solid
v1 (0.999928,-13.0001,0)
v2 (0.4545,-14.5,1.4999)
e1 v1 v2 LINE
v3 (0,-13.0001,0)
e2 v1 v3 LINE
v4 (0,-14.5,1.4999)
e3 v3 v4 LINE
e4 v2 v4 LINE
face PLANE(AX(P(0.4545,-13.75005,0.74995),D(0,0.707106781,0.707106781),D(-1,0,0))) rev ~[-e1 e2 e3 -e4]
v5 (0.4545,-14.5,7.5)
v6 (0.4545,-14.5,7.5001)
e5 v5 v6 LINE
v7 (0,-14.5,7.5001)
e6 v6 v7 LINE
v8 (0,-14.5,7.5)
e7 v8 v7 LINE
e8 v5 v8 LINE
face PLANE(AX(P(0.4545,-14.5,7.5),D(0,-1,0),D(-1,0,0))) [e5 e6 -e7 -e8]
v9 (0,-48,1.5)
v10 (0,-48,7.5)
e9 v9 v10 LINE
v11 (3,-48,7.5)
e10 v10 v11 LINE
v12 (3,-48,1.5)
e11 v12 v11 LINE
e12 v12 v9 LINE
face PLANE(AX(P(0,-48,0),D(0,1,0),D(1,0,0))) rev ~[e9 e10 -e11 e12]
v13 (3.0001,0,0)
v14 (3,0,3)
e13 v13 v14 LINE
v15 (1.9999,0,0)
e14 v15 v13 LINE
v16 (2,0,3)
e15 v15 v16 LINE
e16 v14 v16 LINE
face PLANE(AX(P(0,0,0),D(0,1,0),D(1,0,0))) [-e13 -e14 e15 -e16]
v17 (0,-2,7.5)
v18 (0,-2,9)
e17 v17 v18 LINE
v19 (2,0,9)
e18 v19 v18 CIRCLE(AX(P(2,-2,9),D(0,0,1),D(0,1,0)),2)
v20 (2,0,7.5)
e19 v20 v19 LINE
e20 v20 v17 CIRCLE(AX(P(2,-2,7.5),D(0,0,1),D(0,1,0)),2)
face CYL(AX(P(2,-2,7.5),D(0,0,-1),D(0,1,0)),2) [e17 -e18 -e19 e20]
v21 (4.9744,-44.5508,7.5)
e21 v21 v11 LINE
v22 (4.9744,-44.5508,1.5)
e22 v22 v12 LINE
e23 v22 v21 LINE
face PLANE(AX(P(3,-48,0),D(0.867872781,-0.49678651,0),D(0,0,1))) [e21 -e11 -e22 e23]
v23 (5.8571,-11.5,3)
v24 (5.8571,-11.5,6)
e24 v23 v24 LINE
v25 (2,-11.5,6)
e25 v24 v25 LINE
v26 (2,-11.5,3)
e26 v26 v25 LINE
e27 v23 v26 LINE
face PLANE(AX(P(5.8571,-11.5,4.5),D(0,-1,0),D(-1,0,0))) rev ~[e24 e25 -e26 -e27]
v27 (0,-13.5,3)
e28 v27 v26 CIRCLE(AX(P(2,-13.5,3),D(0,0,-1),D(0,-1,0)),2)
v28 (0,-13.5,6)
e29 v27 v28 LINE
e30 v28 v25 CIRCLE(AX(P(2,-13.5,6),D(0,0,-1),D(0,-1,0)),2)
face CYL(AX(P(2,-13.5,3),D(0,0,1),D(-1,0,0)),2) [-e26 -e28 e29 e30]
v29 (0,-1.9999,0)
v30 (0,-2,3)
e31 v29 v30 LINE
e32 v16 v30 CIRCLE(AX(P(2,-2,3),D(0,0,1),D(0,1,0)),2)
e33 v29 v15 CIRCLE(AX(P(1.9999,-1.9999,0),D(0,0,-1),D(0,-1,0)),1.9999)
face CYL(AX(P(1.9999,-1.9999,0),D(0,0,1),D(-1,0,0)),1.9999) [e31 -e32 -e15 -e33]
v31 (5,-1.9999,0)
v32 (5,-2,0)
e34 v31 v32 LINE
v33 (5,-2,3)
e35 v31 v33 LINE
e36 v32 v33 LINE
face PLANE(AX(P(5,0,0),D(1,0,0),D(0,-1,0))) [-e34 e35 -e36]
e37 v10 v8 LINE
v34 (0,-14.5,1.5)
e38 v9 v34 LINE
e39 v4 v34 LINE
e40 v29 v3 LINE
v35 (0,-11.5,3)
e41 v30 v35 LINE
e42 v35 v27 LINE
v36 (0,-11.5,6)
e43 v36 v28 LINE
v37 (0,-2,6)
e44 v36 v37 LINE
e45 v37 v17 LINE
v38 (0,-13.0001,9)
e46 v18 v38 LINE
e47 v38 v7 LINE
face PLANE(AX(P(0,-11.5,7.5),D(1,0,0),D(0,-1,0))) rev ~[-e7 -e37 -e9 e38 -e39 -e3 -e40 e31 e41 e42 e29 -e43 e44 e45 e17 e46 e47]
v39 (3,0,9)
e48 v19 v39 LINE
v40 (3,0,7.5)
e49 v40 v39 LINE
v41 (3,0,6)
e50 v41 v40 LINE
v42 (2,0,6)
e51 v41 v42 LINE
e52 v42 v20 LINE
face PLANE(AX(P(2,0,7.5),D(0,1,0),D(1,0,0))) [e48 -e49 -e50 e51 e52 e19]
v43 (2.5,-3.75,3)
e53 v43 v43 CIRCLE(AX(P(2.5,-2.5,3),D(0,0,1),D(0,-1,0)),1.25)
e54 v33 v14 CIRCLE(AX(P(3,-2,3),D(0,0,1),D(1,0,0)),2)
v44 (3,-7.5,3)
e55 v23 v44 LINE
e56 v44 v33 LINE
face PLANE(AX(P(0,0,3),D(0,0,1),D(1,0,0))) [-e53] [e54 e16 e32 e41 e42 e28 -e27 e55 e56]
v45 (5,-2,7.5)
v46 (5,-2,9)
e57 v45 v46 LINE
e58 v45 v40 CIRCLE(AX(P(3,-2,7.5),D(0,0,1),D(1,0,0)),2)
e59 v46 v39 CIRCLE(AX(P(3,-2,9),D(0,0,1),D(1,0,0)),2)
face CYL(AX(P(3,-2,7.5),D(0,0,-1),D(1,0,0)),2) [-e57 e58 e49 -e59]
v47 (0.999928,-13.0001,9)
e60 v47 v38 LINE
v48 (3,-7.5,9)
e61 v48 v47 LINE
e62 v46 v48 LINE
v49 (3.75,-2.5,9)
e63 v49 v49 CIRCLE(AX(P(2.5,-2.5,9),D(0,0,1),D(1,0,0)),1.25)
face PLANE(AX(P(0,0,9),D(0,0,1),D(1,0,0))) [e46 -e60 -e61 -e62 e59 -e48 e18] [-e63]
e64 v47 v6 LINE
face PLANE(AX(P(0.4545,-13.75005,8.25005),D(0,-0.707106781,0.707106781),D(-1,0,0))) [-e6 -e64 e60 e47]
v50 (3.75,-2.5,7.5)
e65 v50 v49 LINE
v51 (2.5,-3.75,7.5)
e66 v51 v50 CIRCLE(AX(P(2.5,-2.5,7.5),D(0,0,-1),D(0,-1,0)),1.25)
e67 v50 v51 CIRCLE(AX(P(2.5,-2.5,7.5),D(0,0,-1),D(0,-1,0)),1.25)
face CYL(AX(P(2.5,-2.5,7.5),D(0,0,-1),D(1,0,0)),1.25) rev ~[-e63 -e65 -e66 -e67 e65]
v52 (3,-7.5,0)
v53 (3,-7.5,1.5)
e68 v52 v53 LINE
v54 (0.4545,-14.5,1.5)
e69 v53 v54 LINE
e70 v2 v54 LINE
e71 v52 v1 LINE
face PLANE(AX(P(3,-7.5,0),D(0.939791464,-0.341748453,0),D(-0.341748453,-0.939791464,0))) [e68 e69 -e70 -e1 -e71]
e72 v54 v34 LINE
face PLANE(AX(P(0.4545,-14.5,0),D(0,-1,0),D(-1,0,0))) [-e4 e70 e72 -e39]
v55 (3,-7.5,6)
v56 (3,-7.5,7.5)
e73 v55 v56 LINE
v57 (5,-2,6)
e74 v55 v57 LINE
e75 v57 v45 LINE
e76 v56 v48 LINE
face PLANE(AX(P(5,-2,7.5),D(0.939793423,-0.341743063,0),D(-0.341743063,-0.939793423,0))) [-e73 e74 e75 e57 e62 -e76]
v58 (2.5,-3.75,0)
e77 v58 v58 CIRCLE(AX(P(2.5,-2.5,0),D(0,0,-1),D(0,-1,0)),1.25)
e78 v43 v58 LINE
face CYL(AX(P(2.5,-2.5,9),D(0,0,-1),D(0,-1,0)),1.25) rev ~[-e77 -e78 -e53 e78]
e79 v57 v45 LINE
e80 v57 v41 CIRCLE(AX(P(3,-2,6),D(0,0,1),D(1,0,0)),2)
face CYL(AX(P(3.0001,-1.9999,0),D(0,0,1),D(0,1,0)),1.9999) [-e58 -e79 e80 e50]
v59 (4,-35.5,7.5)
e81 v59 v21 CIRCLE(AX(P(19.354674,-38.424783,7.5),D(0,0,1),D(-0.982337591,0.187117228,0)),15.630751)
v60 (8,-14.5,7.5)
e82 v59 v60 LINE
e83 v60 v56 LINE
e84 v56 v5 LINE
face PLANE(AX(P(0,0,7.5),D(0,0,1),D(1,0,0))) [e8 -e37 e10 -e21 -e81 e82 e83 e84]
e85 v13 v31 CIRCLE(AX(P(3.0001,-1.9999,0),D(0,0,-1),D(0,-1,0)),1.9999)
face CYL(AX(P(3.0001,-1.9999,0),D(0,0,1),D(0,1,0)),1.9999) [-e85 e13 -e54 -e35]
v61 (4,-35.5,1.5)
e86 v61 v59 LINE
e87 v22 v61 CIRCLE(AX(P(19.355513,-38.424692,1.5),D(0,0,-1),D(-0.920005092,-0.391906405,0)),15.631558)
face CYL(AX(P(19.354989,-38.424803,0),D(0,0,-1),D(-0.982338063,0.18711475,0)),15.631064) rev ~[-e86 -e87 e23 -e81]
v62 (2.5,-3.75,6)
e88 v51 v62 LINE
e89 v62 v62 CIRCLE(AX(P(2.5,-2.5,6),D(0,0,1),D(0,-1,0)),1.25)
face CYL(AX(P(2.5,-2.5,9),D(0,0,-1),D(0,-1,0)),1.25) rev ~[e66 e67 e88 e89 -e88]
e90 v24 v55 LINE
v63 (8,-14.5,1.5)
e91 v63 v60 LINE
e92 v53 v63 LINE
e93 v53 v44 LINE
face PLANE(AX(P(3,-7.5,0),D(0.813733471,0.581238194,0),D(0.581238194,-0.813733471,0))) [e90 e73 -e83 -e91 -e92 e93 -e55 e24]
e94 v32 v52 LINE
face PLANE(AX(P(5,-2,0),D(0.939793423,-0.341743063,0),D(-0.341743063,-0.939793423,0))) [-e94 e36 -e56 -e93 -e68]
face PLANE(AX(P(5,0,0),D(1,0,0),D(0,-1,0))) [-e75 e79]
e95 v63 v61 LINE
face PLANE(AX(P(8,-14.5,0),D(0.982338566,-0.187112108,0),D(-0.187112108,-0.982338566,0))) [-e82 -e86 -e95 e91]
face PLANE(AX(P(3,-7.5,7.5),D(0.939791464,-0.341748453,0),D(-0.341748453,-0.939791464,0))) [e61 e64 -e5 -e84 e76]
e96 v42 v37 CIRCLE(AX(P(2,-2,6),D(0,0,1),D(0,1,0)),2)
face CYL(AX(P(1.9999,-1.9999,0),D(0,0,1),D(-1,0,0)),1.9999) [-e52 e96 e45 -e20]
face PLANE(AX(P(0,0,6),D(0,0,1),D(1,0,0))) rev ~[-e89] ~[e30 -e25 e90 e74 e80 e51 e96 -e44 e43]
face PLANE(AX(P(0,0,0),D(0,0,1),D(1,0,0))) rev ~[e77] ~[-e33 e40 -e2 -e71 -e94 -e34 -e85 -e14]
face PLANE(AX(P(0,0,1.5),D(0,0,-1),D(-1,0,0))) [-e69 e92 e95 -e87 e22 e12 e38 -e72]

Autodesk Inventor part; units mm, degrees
ref_plane "YZ Plane" through (0, 0, 0) normal (1, 0, 0) x (0, 1, 0)
ref_plane "XZ Plane" through (0, 0, 0) normal (0, 1, 0) x (-1, 0, 0)
sketch "Base" plane through (0, 0, 0) normal (0, 0, 1) x (1, 0, 0)
  line L0 (0, 0) -> (0, -48)
  line L1 (0, 0) -> (5, 0)
  line L2 (5, 0) -> (5, -2)
  line L3 (3, -7.5) -> (8, -14.5)
  line L4 (8, -14.5) -> (4, -35.5)
  arc A0 (4, -35.5) -> (7, -48) centre (19.3551, -38.4248) ccw
  line L5 (0, -48) -> (7, -48)
  line L6 (5, -2) -> (3, -7.5)
  dimension "d0" = 48
  dimension "d1" = 5
  dimension "d6" = 21
  dimension "d10" = 4
  dimension "d51" = 3
  dimension "d52" = 8
  dimension "d53" = 5.5
  dimension "d54" = 2
  dimension "d55" = 7
  dimension "d112" = 7
extrude "BaseFeature" add sketch "Base" along normal blind 9
chamfer "EndChamferFeature" distance 4 angle 45 1 edges at (7, -48, 4.5)
sketch "MountHole" plane through (0, 0, 9) normal (0, 0, 1) x (1, 0, 0)
  circle A0 centre (2.5, -2.5) radius 1.25
  line L0 (5, 0) -> (0, 0) construction
  line L1 (0, 0) -> (0, -48) construction
  dimension "d40" = 2.5
  dimension "d41" = 2.5
  dimension "d42" = 2.5
hole "MountHoleFeature" at (2.5, -2.5, 9) direction (0, 0, -1) diameter 2.5 end through all
fillet "EndFilletsFeature" radius 2 2 edges at (0, 0, 4.5) (5, 0, 4.5)
ref_plane "MidPlane" through (0, 0, 4.5) normal (0, 0, 1) x (1, 0, 0)
sketch "MountCut" plane through (0, 0, 4.5) normal (0, 0, 1) x (1, 0, 0)
  line L0 (4.9744, -44.5508) -> (3, -48) projected
  arc A0 (4, -35.5) -> (4.9744, -44.5508) centre (19.3551, -38.4248) ccw projected
  line L1 (4, -35.5) -> (8, -14.5) projected
  line L2 (8, -14.5) -> (3, -7.5) projected
  line L3 (3, -7.5) -> (5, -2) projected
  arc A1 (5, -2) -> (3, 0) centre (3, -2) ccw projected
  line L4 (3, 0) -> (2, 0) projected
  arc A2 (2, 0) -> (0, -2) centre (2, -2) ccw projected
  line L5 (0, -2) -> (0, -48) projected
  circle A3 centre (2.5, -2.5) radius 1.25 projected
  line L6 (3, -7.5) -> (0, -7.5)
  line L7 (8, -14.5) -> (3, -7.5) projected
  line L8 (5.8571, -11.5) -> (0, -11.5)
  line L9 (0, -2) -> (0, -48) projected
  line L10 (0, -48) -> (3, -48) projected
  point P0 (0, -39.1407)
  dimension "d81" = 4
extrude "MountCutFeature" cut sketch "MountCut" along normal mid plane 3 contours L5 L6 L2 L8 | L5 A2 L4 A1 L3 L6
sketch "LeftTrim" plane through (0, 0, 9) normal (0, 0, 1) x (1, 0, 0)
  line L0 (4.9744, -44.5508) -> (3, -48) projected
  arc A0 (4, -35.5) -> (4.9744, -44.5508) centre (19.3551, -38.4248) ccw projected
  line L1 (4, -35.5) -> (8, -14.5) projected
  line L2 (8, -14.5) -> (3, -7.5) projected
  line L3 (3, -7.5) -> (5, -2) projected
  arc A1 (5, -2) -> (3, 0) centre (3, -2) ccw projected
  line L4 (3, 0) -> (2, 0) projected
  arc A2 (2, 0) -> (0, -2) centre (2, -2) ccw projected
  line L5 (0, -2) -> (0, -48) projected
  circle A3 centre (2.5, -2.5) radius 1.25 projected
  line L6 (3, -7.5) -> (-0.5, -7.5)
  line L7 (0, -48) -> (3, -48) projected
extrude "LeftTrimFeature" cut sketch "LeftTrim" against normal blind 1.5 contours L0 L7 L5 L6 L2 L1 A0 | L5 A2 L4 A1 L3 L6 | A3
sketch "LeftReinforce" plane through (0, 0, 7.5) normal (0, 0, 1) x (1, 0, 0)
  circle A0 centre (2.5, -2.5) radius 1.25 projected
  line L0 (0, -11.5) -> (0, -2) construction
  line L1 (5.8571, -11.5) -> (0, -11.5) construction
  line L2 (3, -7.5) -> (5.8571, -11.5) construction
  line L3 (5, -2) -> (3, -7.5) projected
  arc A1 (5, -2) -> (3, 0) centre (3, -2) ccw projected
  line L4 (2, 0) -> (3, 0) projected
  arc A2 (2, 0) -> (0, -2) centre (2, -2) ccw projected
  line L5 (0, -11.5) -> (0, -2)
  line L6 (0, -11.5) -> (0, -14.5)
  line L7 (3, -7.5) -> (0.4545, -14.5)
  line L8 (0.4545, -14.5) -> (0, -14.5)
  line L9 (0.4545, -14.5) -> (8, -14.5) construction
extrude "LeftReinforceFeature" add sketch "LeftReinforce" along normal blind 1.5
sketch "RightTrim" plane through (0, 0, 0) normal (0, 0, -1) x (-1, 0, 0)
  line L0 (0, -48) -> (0, -14.5) projected
  line L1 (-4.9744, -44.5508) -> (-3, -48) projected
  arc A0 (-4.9744, -44.5508) -> (-4, -35.5) centre (-19.3551, -38.4248) ccw projected
  line L2 (-8, -14.5) -> (-4, -35.5) projected
  line L3 (-3, -7.5) -> (-8, -14.5) projected
  line L4 (-3, -7.5) -> (-0.4545, -14.5) projected
  line L5 (-0.4545, -14.5) -> (0, -14.5) projected
  line L6 (-3, -48) -> (0, -48) projected
extrude "RightTrimFeature" cut sketch "RightTrim" against normal blind 1.5
chamfer "MountSideChamfersFeature" distance 1.5 angle 45 2 edges at (0.2273, -14.5, 9) (0.2273, -14.5, 0)
fillet "MiddleCutBottomFilletFeature" radius 2 1 edges at (0, -11.5, 4.5)
properties part number "ProximalPhalangeIndex2"
